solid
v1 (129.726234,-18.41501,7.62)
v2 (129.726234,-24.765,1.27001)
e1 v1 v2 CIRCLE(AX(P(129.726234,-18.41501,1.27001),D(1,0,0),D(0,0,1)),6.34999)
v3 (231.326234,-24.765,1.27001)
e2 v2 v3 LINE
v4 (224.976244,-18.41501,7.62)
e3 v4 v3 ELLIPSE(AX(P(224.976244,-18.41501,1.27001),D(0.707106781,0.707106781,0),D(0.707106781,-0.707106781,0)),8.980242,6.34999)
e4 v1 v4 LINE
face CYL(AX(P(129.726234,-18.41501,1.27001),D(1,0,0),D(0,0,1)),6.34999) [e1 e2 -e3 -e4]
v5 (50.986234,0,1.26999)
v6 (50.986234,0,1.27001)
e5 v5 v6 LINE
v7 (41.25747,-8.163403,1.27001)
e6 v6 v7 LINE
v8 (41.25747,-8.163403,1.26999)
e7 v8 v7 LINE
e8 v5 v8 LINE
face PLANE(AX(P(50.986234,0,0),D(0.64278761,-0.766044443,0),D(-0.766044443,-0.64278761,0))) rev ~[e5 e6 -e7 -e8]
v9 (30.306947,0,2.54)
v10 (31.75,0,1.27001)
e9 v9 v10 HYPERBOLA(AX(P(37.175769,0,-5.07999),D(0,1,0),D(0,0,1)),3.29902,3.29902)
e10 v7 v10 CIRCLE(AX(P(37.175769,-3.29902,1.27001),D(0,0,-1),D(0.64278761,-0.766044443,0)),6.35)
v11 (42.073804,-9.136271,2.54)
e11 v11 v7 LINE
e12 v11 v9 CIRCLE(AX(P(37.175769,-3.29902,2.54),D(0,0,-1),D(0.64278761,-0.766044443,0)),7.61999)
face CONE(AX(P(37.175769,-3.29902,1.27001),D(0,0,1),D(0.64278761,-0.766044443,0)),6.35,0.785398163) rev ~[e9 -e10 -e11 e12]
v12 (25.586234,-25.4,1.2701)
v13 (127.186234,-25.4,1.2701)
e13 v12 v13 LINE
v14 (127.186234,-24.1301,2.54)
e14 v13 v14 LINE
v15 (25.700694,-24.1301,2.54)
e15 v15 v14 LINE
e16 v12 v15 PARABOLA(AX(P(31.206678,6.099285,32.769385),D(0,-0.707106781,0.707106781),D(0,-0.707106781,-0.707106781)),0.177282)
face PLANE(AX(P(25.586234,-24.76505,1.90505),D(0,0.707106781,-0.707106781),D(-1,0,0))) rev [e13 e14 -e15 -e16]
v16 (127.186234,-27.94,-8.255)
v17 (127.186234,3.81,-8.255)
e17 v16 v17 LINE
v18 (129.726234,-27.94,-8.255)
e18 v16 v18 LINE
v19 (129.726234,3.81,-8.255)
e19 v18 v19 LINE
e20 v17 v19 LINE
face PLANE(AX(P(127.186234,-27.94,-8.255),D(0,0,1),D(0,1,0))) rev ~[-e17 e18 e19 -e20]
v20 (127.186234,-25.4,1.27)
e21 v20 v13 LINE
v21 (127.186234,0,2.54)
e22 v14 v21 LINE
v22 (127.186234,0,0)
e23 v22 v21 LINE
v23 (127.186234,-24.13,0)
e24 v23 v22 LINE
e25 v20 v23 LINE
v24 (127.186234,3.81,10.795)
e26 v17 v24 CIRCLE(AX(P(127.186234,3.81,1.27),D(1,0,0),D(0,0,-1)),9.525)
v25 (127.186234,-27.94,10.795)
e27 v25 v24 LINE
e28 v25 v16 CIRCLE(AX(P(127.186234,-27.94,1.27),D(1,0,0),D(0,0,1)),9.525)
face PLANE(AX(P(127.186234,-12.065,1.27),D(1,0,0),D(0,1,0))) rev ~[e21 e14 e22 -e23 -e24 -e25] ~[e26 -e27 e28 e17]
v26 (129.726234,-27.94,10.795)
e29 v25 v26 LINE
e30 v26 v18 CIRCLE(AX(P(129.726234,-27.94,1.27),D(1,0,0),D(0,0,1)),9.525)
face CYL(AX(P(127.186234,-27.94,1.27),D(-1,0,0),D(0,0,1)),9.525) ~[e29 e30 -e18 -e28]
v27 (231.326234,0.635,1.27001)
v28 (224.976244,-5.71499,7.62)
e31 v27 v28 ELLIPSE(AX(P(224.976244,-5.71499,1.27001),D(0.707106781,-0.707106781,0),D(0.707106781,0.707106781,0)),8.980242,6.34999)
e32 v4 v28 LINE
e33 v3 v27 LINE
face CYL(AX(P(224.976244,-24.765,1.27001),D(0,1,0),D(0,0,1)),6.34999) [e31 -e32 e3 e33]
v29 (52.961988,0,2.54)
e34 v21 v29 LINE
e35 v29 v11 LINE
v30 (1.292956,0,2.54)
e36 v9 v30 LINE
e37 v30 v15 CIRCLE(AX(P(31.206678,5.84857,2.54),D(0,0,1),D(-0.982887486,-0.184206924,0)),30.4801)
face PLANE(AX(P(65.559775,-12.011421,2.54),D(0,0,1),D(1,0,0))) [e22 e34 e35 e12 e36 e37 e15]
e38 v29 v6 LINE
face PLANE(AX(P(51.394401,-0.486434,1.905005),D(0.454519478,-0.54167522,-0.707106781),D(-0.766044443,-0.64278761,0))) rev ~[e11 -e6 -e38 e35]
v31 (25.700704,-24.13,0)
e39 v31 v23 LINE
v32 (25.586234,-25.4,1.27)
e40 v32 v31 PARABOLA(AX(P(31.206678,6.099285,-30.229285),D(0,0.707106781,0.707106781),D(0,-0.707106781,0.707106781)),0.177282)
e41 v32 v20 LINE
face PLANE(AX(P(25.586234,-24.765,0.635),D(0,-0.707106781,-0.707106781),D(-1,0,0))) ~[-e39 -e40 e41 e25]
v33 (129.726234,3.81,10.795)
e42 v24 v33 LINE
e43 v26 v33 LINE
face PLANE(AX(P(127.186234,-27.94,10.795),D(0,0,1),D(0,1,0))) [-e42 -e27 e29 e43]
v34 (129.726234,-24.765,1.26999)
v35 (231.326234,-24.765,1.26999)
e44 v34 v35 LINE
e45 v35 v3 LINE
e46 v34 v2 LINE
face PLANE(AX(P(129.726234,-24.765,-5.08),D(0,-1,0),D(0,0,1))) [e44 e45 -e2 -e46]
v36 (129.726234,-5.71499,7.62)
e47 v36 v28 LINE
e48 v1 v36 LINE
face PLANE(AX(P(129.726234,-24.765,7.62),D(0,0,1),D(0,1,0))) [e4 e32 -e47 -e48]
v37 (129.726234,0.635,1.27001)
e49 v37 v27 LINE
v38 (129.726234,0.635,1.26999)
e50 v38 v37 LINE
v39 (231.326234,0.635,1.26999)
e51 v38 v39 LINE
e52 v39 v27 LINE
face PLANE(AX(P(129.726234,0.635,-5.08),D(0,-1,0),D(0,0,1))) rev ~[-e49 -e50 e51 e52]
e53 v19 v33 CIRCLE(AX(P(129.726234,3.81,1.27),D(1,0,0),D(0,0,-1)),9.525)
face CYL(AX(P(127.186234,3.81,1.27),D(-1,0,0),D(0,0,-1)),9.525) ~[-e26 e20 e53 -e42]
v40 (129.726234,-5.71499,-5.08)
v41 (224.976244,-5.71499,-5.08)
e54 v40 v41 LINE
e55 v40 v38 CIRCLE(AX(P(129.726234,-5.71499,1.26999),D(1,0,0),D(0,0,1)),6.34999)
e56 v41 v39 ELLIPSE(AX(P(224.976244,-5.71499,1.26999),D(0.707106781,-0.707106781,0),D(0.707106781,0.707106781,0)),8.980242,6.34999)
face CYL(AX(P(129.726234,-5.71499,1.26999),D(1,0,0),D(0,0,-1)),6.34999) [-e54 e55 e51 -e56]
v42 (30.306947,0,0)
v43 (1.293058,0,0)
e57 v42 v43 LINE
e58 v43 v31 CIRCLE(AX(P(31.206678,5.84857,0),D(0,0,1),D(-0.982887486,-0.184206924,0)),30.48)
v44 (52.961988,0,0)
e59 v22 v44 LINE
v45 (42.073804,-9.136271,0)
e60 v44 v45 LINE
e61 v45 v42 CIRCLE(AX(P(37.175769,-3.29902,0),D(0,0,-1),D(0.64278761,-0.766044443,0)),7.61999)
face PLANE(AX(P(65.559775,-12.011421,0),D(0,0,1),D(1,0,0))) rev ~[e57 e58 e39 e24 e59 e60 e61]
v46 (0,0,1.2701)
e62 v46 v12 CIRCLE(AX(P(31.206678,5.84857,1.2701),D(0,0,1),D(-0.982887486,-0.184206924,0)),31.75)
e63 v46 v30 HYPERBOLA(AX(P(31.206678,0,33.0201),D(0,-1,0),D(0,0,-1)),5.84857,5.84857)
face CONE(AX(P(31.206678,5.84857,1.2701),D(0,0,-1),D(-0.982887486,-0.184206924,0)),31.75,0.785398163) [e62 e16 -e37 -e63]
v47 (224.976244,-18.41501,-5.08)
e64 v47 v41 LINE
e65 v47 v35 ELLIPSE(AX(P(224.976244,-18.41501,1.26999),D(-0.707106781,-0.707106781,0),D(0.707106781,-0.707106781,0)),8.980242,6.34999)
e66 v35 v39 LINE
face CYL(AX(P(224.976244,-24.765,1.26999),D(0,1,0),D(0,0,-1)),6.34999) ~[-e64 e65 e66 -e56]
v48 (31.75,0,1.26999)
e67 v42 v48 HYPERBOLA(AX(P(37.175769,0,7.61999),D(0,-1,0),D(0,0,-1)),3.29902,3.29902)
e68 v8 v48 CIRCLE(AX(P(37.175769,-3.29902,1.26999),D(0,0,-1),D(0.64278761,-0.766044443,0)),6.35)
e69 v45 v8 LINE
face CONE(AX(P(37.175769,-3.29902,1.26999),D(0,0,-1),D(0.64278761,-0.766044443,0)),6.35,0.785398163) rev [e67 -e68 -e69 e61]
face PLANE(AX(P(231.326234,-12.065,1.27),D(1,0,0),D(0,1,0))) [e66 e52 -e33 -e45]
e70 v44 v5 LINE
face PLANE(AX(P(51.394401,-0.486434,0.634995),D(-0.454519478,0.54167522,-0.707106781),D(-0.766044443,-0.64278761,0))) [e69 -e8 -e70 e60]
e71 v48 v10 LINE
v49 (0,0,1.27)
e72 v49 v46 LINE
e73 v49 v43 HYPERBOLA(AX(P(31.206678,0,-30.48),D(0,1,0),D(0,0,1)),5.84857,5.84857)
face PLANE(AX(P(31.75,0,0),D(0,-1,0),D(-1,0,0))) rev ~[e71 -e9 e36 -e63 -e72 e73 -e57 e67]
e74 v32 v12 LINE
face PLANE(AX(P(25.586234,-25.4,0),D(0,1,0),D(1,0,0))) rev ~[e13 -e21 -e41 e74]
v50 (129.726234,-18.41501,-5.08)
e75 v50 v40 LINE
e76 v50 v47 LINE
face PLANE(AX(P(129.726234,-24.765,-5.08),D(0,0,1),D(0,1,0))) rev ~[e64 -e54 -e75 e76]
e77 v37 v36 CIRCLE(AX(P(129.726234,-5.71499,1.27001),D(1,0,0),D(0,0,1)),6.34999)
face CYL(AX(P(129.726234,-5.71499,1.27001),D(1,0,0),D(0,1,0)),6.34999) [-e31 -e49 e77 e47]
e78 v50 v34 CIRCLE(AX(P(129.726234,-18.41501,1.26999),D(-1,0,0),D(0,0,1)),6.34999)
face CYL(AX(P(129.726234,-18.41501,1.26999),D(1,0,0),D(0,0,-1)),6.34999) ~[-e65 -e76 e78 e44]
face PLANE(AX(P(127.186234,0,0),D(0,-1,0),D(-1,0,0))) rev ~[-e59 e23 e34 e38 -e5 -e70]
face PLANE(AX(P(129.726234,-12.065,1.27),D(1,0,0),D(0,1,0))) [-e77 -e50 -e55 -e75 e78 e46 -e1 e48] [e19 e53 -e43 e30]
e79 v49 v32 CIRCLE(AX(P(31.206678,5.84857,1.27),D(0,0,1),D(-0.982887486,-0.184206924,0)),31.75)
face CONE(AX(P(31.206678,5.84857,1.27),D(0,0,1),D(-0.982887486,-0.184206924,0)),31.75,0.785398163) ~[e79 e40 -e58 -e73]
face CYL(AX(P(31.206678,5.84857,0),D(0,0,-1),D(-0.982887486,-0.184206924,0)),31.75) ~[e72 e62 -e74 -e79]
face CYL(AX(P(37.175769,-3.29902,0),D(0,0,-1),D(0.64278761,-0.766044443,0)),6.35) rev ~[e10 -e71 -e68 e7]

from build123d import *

# Parameters (mm, degrees)
F1_DEPTH   = 2.54
F2_C1_SIZE = 1.27
F2_C2_SIZE = 1.2699
F2_C3_SIZE = 1.27
F2_C4_SIZE = 1.2699
F3_SIZE    = 1.26999
F4_W       = 31.75
F4_H       = 19.05
F5_DEPTH   = 2.54
F6_W       = 25.4
F6_H       = 12.7
F7_DEPTH   = 101.6
F8_R       = 6.34999


# Not quite as in the source:
# - a fillet or chamfer is up to 0.001 mm smaller than in the source, because OpenCascade refuses the exact size


with BuildPart() as f1:
    # F0 (on Top) → F1 (new body)
    with BuildSketch(Plane.XY):
        with BuildLine():
            Line((31.75, 0), (0, 0))
            ThreePointArc((0, 0), (8.8381906554, -16.6839242395), (25.5862342852, -25.4))
            Line((25.5862342852, -25.4), (127.1862342852, -25.4))
            Line((127.1862342852, -25.4), (127.1862342852, 0))
            Line((127.1862342852, 0), (50.9862342852, 0))
            Line((50.9862342852, 0), (41.2574698576, -8.163402643))
            ThreePointArc((41.2574698576, -8.163402643), (33.0391135049, -8.1167569468), (31.75, 0))
        make_face()
    extrude(amount=F1_DEPTH)

    # F2: chamfer of 1.27 on 4 edges, made by hand

    # F2_c1
    f2_c1_edges = [f1.edges().sort_by_distance(p)[0] for p in [
        (76.3862342852, -25.4, 0),
    ]]
    chamfer(f2_c1_edges, length=F2_C1_SIZE)

    # F2_c2 (size 1.27 in the source; OpenCascade refuses exactly that, so slightly less here)
    f2_c2_edges = [f1.edges().sort_by_distance(p)[0] for p in [
        (76.3862342852, -25.4, 2.54),
    ]]
    chamfer(f2_c2_edges, length=F2_C2_SIZE)

    # F2_c3
    f2_c3_edges = [f1.edges().sort_by_distance(p)[0] for p in [
        (7.1332744951, -14.8524871452, 0),
    ]]
    chamfer(f2_c3_edges, length=F2_C3_SIZE)

    # F2_c4 (size 1.27 in the source; OpenCascade refuses exactly that, so slightly less here)
    f2_c4_edges = [f1.edges().sort_by_distance(p)[0] for p in [
        (7.133373479, -14.8526022537, 2.54),
    ]]
    chamfer(f2_c4_edges, length=F2_C4_SIZE)

    # F3 (size 1.27 in the source; OpenCascade refuses exactly that, so slightly less here)
    f3_edges = [f1.edges().sort_by_distance(p)[0] for p in [
        (33.039114, -8.116757, 0),
        (33.039114, -8.116757, 2.54),
        (46.121852, -4.081701, 0),
        (46.121852, -4.081701, 2.54),
    ]]
    chamfer(f3_edges, length=F3_SIZE)

    # F4 (on face) → F5 (join)
    with BuildSketch(Plane.YZ.offset(127.1862342852)):
        with Locations((-12.065, 1.27)):
            Rectangle(F4_W, F4_H)
        with BuildLine():
            ThreePointArc((3.81, -8.255), (13.335, 1.27), (3.81, 10.795))
            Line((3.81, 10.795), (3.81, -8.255))
        make_face()
        with BuildLine():
            Line((-27.94, -8.255), (-27.94, 10.795))
            ThreePointArc((-27.94, 10.795), (-37.465, 1.27), (-27.94, -8.255))
        make_face()
    extrude(amount=F5_DEPTH)

    # F6 (on face) → F7 (join)
    with BuildSketch(Plane.YZ.offset(129.7262342852)):
        with Locations((-12.065, 1.27)):
            Rectangle(F6_W, F6_H)
    extrude(amount=F7_DEPTH)

    # F8 (radius 6.35 in the source; OpenCascade refuses exactly that, so slightly less here)
    f8_edges = [f1.edges().sort_by_distance(p)[0] for p in [
        (180.526234, 0.635, 7.62),
        (180.526234, 0.635, -5.08),
        (180.526234, -24.765, -5.08),
        (180.526234, -24.765, 7.62),
        (231.326234, -12.065, 7.62),
        (231.326234, -12.065, -5.08),
    ]]
    fillet(f8_edges, radius=F8_R)


solid = f1.part
